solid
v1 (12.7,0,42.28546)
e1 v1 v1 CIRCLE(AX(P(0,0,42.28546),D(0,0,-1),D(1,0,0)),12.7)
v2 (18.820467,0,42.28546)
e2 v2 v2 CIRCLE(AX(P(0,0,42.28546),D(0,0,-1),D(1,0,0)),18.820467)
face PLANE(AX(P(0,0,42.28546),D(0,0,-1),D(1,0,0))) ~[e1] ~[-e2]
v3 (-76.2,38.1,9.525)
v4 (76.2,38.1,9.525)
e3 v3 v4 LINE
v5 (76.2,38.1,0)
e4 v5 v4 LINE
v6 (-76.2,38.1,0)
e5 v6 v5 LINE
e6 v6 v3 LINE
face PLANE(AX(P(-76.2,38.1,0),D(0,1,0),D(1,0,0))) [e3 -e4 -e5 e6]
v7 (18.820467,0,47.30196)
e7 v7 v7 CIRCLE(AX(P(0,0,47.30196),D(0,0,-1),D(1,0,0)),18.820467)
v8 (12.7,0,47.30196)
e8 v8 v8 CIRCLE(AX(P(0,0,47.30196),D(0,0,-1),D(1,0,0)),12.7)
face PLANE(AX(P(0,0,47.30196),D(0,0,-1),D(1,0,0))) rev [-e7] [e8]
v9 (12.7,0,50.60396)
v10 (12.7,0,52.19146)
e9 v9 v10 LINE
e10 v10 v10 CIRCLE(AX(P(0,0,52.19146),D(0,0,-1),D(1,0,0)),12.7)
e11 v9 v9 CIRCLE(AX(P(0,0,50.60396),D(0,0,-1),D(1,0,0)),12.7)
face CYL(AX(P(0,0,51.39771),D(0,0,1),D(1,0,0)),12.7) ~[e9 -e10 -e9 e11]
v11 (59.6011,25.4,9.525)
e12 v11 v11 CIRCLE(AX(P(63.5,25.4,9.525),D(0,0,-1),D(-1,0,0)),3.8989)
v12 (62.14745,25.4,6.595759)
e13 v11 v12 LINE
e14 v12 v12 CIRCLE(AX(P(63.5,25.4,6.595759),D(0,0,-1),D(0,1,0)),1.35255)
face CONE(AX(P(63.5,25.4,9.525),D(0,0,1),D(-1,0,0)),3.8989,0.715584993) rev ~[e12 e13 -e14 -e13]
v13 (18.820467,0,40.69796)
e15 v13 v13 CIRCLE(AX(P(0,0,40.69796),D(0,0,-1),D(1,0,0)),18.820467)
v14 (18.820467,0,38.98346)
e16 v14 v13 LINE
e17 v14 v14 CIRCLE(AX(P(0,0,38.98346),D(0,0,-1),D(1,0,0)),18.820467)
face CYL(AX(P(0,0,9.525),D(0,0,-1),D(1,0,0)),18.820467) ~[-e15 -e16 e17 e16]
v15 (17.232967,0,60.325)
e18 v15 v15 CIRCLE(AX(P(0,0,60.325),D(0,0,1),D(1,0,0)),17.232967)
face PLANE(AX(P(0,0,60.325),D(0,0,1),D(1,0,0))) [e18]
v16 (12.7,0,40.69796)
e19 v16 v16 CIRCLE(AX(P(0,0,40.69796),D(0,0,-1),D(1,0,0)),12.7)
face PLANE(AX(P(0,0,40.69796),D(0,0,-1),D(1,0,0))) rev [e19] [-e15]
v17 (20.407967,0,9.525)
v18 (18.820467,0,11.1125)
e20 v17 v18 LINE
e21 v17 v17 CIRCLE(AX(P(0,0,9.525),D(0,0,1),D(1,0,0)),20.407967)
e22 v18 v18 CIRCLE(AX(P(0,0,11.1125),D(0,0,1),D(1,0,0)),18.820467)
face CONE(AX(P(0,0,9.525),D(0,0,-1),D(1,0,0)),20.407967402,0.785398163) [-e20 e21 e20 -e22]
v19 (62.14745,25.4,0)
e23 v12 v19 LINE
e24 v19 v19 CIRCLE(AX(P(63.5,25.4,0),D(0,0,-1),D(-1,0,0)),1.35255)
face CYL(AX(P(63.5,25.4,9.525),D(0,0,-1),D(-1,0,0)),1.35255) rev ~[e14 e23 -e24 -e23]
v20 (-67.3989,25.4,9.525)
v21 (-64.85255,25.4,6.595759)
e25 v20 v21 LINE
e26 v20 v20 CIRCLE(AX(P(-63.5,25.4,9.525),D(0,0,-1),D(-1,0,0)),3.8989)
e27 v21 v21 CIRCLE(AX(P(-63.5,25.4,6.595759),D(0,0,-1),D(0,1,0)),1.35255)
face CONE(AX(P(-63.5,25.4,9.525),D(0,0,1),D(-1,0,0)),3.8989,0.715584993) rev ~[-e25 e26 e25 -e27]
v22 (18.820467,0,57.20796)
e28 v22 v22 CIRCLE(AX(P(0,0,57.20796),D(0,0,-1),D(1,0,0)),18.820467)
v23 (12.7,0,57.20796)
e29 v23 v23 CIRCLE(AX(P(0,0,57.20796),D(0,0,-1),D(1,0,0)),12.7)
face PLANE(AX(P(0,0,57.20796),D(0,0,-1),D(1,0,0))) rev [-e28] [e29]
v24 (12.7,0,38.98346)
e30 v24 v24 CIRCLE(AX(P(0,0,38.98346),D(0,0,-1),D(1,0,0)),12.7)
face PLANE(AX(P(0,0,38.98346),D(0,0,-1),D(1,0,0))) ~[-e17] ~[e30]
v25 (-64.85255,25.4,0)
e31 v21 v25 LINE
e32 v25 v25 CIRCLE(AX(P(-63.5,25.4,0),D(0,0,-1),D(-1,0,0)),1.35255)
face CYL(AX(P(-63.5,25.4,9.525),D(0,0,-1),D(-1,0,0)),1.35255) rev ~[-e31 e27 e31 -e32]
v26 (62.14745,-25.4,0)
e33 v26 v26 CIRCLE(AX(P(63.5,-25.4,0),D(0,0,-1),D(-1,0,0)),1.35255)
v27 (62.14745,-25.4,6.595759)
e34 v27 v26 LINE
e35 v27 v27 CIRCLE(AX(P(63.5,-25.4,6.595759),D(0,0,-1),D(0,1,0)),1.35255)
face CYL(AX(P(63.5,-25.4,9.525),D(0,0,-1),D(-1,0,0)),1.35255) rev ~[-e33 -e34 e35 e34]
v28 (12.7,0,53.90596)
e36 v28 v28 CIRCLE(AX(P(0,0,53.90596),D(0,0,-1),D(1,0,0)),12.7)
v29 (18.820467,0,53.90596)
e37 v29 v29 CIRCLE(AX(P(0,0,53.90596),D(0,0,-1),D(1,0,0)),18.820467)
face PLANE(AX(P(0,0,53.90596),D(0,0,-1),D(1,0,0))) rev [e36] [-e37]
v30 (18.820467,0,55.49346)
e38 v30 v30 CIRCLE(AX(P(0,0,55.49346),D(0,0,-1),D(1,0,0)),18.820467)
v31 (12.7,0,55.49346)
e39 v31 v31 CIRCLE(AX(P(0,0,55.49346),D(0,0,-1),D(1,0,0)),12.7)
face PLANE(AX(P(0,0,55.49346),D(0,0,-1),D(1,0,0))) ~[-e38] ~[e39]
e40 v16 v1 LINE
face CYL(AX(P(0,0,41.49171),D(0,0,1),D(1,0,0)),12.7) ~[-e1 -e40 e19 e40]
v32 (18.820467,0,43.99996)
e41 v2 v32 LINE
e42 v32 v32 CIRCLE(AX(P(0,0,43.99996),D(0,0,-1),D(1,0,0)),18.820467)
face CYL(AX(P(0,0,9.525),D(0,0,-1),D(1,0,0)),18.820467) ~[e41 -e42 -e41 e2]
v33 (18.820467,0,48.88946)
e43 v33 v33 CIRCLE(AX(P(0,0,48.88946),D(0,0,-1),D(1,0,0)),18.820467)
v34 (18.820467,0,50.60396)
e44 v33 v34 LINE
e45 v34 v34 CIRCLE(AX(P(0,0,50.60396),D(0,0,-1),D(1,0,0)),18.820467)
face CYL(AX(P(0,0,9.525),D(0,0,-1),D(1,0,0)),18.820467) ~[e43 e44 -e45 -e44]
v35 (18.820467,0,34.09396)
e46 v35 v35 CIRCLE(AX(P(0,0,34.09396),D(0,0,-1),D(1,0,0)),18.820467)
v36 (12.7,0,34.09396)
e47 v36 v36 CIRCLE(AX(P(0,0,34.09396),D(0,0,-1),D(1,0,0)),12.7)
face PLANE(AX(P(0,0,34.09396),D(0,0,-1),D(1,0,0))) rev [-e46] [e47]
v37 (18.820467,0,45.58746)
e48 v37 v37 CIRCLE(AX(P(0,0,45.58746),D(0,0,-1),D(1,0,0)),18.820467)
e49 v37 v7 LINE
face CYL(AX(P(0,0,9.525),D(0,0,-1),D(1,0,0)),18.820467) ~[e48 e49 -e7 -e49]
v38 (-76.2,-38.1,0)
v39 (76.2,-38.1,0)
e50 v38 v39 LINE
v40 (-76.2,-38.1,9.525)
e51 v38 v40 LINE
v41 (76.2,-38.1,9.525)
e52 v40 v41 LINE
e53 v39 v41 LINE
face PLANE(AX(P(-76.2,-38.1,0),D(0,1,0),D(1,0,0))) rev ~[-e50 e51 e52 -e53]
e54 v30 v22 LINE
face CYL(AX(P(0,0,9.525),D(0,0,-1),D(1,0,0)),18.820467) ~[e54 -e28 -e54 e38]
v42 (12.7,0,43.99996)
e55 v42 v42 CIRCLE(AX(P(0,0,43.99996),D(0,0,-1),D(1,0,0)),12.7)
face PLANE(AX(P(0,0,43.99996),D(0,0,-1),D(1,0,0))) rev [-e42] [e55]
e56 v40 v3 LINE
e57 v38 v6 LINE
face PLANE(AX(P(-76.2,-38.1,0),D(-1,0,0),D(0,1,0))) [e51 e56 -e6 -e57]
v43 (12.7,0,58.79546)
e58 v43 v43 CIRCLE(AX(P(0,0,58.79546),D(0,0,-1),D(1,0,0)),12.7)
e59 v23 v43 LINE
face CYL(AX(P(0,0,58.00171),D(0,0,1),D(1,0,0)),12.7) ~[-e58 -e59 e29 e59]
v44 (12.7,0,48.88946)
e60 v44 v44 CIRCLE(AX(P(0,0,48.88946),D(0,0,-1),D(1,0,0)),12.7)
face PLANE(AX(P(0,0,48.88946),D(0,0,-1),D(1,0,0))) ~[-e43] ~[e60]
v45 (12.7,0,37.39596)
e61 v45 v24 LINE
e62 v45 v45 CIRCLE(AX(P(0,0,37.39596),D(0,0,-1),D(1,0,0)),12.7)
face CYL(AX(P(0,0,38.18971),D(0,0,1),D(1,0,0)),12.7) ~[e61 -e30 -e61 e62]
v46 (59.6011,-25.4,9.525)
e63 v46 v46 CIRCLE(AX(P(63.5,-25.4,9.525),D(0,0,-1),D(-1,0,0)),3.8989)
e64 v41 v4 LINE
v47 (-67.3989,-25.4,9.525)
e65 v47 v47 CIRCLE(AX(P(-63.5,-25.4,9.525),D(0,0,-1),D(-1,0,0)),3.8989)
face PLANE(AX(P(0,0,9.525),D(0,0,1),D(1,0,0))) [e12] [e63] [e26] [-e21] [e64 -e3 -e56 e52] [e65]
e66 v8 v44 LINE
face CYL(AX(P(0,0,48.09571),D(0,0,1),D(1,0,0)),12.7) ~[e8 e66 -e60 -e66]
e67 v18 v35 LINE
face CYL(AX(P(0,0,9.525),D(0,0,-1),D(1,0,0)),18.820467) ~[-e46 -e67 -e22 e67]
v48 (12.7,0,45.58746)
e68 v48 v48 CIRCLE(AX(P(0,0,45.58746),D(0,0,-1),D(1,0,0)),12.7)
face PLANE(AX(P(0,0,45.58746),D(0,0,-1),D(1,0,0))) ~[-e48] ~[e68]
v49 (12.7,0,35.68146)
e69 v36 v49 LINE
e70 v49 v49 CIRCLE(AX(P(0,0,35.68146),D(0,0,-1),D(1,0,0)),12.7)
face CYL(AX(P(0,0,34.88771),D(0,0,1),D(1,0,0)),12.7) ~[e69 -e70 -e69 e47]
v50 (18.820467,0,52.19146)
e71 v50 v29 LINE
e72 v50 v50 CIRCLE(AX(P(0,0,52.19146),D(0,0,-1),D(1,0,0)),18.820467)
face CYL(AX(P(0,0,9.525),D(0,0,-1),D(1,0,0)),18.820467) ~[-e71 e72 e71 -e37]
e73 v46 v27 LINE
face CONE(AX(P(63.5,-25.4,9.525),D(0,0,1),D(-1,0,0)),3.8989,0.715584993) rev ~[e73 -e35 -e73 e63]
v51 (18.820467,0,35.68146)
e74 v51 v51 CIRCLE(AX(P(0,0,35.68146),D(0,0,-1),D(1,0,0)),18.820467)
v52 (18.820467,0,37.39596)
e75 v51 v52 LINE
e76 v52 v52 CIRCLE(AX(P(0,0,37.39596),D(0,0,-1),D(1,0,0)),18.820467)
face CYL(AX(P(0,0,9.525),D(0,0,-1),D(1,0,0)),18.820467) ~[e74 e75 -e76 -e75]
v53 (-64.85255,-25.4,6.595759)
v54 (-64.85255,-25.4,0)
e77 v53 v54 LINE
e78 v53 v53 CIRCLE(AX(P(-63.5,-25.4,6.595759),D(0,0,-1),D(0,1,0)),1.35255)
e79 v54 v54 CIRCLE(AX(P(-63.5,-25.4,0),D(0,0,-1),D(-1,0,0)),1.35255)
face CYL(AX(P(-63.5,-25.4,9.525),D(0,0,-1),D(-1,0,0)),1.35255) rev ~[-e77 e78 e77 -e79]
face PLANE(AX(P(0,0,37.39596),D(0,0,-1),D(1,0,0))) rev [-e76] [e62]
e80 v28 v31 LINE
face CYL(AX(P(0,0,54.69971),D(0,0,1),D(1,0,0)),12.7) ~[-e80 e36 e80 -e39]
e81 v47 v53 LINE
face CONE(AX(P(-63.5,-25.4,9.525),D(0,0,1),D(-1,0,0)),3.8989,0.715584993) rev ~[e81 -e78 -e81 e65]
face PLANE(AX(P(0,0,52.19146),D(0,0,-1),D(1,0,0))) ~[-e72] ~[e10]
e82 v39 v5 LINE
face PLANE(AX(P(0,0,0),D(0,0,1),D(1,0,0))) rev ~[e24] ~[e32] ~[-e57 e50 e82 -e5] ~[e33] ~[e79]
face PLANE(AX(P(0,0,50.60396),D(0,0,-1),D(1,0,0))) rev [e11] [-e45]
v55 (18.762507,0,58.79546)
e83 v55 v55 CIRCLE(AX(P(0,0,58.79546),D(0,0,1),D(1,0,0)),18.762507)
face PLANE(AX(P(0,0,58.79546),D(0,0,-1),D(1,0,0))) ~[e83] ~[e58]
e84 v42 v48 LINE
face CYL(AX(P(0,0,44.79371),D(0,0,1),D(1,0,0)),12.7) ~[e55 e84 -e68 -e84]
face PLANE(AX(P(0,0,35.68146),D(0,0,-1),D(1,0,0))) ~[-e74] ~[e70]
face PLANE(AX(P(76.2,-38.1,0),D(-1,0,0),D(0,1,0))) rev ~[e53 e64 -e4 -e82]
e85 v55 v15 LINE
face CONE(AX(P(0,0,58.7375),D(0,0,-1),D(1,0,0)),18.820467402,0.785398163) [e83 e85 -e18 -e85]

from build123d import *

# Parameters (mm, degrees)
F0_W           = 152.4
F0_H           = 76.2
F1_DEPTH       = 9.525
F3_D           = 2.7051
F3_CSINK_D     = 7.7978
F3_CSINK_ANGLE = 82
F4_R           = 18.8204674016
F5_DEPTH       = 50.8
F6_W           = 14.3435228881
F6_H           = 1.5875


# Not quite as in the source:
# - a fillet or chamfer that OpenCascade refuses, or shapes differently, is made with other operations: its cross-section is extruded or revolved along the edge and cut away or added


with BuildPart() as f1:
    # F0 (on Top) → F1 (new body)
    with BuildSketch(Plane.XY):
        Rectangle(F0_W, F0_H)
    extrude(amount=F1_DEPTH)

    # F3 (through all)
    with Locations(Plane.XY.offset(9.525)):
        with Locations((-63.5, 25.4), (63.5, 25.4), (-63.5, -25.4), (63.5, -25.4)):
            CounterSinkHole(F3_D / 2, F3_CSINK_D / 2, counter_sink_angle=F3_CSINK_ANGLE)

    # F4 (on face) → F5 (join)
    with BuildSketch(Plane.XY.offset(9.525)):
        Circle(F4_R)
    extrude(amount=F5_DEPTH)

    # F6 (on Front) → F7 (revolve, cut)
    with BuildSketch(Plane.XZ):
        with Locations((19.8717614441, 34.8877100782)):
            Rectangle(F6_W, F6_H)
        with Locations((19.8717614441, 38.1897100782)):
            Rectangle(F6_W, F6_H)
        with Locations((19.8717614441, 41.4917100782)):
            Rectangle(F6_W, F6_H)
        with Locations((19.8717614441, 44.7937100782)):
            Rectangle(F6_W, F6_H)
        with Locations((19.8717614441, 48.0957100782)):
            Rectangle(F6_W, F6_H)
        with Locations((19.8717614441, 51.3977100782)):
            Rectangle(F6_W, F6_H)
        with Locations((19.8717614441, 54.6997100782)):
            Rectangle(F6_W, F6_H)
        with Locations((19.8717614441, 58.0017100782)):
            Rectangle(F6_W, F6_H)
    revolve(axis=Axis((0, 0, 9.525), (0, 0, -1)), mode=Mode.SUBTRACT)

    # F8: chamfer of 1.5875 on 2 edges, made by hand

    # F8_s1 → F8_t2 (revolve)
    with BuildSketch(Plane.XZ):
        Polygon((20.4079674016, 9.525), (18.8204674016, 11.1125), (18.8204674016, 9.525), align=None)
    revolve(axis=Axis((0, 0, 9.525), (0, 0, 1)))

    # F8_s3 → F8_t4 (revolve, cut)
    with BuildSketch(Plane.XZ):
        Polygon((18.8204674016, 58.7375), (17.2329674016, 60.325), (18.8204674016, 60.325), align=None)
    revolve(axis=Axis((0, 0, 60.325), (0, 0, 1)), mode=Mode.SUBTRACT)


solid = f1.part
